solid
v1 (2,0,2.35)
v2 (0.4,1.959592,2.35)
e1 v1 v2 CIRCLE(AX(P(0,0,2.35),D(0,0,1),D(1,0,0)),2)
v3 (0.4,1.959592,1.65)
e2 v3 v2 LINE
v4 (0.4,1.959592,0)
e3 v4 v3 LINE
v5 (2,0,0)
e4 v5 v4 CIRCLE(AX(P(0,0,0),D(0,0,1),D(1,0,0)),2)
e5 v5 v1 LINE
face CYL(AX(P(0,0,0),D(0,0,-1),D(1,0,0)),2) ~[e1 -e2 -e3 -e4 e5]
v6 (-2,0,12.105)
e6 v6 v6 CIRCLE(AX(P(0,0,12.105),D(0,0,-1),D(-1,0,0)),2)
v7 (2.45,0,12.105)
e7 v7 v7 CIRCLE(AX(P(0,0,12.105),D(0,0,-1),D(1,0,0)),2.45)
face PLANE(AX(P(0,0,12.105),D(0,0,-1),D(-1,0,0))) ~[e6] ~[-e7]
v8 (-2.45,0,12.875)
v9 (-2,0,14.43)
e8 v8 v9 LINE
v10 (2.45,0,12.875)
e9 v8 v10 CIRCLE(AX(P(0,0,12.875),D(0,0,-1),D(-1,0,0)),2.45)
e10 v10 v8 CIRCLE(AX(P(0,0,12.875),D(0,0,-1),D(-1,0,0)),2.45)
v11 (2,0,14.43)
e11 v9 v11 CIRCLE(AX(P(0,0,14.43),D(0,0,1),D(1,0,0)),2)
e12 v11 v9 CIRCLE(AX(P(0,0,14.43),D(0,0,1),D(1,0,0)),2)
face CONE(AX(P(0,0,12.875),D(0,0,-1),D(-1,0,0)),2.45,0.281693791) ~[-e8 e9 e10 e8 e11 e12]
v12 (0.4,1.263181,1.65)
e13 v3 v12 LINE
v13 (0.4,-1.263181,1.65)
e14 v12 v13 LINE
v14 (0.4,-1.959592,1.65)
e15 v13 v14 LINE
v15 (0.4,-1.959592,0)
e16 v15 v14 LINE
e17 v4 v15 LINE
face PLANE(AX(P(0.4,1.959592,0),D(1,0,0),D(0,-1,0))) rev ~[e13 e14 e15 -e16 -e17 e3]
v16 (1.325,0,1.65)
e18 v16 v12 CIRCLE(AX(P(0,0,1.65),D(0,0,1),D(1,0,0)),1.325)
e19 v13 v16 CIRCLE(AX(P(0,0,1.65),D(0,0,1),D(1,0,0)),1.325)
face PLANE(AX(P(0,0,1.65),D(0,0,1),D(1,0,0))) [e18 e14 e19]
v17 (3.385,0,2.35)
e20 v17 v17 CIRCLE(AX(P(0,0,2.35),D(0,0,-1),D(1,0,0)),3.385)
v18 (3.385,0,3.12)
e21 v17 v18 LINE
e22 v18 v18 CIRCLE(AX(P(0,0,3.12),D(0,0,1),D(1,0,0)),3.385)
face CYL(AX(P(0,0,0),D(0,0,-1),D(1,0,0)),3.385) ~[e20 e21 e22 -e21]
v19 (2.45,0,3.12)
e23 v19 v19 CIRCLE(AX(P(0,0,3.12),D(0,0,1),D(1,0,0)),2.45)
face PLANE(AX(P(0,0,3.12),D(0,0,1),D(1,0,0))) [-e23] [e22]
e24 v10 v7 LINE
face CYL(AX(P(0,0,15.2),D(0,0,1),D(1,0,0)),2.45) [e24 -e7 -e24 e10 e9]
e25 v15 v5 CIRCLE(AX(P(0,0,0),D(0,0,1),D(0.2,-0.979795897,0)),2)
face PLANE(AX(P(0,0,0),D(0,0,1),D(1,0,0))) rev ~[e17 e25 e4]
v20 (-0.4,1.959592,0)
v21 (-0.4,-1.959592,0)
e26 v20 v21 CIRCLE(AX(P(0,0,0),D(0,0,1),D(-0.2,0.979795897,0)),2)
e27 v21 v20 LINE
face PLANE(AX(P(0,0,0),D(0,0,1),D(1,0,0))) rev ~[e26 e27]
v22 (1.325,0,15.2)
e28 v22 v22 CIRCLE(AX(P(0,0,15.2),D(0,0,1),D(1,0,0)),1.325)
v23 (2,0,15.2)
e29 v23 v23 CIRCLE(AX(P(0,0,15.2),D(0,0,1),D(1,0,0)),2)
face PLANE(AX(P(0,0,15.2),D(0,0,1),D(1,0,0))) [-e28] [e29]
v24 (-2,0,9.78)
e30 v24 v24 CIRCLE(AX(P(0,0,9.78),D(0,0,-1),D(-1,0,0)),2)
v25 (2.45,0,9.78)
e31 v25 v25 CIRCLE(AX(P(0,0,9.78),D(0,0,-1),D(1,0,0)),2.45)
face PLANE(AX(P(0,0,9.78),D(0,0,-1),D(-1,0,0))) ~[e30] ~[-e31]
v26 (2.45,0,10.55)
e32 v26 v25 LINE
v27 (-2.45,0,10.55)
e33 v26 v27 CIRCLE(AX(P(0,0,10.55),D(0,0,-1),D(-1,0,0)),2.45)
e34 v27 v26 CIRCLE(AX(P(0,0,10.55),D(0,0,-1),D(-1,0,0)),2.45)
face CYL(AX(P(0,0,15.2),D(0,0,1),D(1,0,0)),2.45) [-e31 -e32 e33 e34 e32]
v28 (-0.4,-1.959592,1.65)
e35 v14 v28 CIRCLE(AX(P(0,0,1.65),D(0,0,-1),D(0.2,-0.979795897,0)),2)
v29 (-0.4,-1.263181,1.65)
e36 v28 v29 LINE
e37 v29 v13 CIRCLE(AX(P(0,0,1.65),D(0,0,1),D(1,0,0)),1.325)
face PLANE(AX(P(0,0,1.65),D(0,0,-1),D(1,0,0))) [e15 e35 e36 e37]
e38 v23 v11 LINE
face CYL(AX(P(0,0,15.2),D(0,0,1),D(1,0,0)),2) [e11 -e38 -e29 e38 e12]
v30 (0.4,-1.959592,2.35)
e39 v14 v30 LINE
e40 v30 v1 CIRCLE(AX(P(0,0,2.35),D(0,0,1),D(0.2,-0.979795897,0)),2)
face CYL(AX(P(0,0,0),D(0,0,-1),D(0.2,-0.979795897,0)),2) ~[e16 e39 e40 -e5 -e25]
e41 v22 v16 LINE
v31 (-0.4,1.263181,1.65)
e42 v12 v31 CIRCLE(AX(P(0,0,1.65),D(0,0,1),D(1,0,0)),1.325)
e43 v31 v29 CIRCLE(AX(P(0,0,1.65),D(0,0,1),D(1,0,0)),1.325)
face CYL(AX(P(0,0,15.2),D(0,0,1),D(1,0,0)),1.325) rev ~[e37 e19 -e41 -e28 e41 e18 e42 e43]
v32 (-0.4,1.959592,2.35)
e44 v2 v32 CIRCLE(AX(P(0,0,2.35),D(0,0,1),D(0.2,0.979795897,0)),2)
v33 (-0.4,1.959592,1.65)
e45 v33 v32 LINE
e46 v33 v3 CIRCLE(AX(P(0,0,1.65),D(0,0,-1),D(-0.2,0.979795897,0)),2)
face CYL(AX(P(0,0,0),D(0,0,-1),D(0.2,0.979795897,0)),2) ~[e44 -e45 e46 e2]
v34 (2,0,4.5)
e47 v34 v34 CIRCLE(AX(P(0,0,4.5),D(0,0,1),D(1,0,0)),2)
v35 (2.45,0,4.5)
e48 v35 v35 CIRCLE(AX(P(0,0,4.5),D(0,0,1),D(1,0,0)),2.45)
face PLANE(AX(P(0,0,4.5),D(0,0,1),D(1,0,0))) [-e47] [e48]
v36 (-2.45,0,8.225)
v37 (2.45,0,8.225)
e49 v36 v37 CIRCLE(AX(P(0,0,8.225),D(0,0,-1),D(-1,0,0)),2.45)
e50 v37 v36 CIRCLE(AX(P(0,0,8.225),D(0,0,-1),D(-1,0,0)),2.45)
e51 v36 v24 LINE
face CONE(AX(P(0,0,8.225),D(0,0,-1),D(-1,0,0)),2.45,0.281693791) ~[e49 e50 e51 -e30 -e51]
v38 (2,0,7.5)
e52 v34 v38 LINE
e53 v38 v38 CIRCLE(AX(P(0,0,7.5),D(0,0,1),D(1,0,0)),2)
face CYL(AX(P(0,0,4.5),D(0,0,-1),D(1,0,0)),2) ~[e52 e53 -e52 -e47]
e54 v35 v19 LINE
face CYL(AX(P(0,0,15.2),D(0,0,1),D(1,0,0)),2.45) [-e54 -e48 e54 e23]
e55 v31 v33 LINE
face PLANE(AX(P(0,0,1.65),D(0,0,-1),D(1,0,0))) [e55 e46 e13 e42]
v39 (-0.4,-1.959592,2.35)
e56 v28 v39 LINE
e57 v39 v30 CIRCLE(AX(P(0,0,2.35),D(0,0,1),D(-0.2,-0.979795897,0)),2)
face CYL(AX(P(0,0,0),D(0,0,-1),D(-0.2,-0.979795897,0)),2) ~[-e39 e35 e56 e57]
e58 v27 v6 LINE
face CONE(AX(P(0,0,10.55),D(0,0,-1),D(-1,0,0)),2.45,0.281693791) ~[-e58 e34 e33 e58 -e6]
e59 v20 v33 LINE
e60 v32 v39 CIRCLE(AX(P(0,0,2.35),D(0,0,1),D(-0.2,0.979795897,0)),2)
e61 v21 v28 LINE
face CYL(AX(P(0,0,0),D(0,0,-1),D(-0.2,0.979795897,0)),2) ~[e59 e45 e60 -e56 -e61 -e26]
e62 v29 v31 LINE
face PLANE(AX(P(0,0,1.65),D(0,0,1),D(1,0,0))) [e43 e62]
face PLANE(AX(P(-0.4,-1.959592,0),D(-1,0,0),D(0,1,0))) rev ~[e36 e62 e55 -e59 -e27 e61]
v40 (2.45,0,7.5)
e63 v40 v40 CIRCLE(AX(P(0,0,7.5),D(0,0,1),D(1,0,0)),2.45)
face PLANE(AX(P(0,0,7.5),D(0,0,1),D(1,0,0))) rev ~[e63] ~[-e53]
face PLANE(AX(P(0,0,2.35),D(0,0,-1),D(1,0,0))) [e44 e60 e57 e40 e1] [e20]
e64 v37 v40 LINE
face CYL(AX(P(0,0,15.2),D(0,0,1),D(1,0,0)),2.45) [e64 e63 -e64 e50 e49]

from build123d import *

# Parameters (mm, degrees)
F0_R      = 3.385
F1_DEPTH  = 15.2
F2_R      = 3.385
F3_DEPTH  = 2.35
F4_DEPTH  = 1.65
F6_R      = 3.385
F6_R_2    = 2.45
F7_DEPTH  = 12.08
F9_R      = 3.385
F9_R_2    = 2
F10_DEPTH = 3
F11_R     = 2.45
F11_R_2   = 2
F12_DEPTH = 0.77
F31_R     = 1.325
F32_DEPTH = 13.55


with BuildPart() as f1:
    # F0 (on Top) → F1 (new body)
    with BuildSketch(Plane.XY):
        Circle(F0_R)
    extrude(amount=F1_DEPTH)

    # F2 (on face) → F3 (cut)
    with BuildSketch(Plane(origin=(0, 0, 0), x_dir=(1, 0, 0), z_dir=(0, 0, -1))):
        Circle(F2_R)
        with BuildLine():
            ThreePointArc((0.4, 1.9595917942), (1.5491933385, 1.2649110641), (2, 0))
            ThreePointArc((2, 0), (1.5491933385, -1.2649110641), (0.4, -1.9595917942))
            ThreePointArc((0.4, -1.9595917942), (0, -2), (-0.4, -1.9595917942))
            ThreePointArc((-0.4, -1.9595917942), (-2, 0), (-0.4, 1.9595917942))
            ThreePointArc((-0.4, 1.9595917942), (0, 2), (0.4, 1.9595917942))
        make_face(mode=Mode.SUBTRACT)
    extrude(amount=-F3_DEPTH, mode=Mode.SUBTRACT)

    # F2 (on face) → F4 (cut)
    with BuildSketch(Plane(origin=(0, 0, 0), x_dir=(1, 0, 0), z_dir=(0, 0, -1))):
        with BuildLine():
            Line((0.4, -1.9595917942), (0.4, 1.9595917942))
            ThreePointArc((0.4, 1.9595917942), (0, 2), (-0.4, 1.9595917942))
            Line((-0.4, 1.9595917942), (-0.4, -1.9595917942))
            ThreePointArc((-0.4, -1.9595917942), (0, -2), (0.4, -1.9595917942))
        make_face()
    extrude(amount=-F4_DEPTH, mode=Mode.SUBTRACT)

    # F6 (on face) → F7 (cut, through all)
    with BuildSketch(Plane.XY.offset(15.2)):
        Circle(F6_R)
        Circle(F6_R_2, mode=Mode.SUBTRACT)
    extrude(amount=-F7_DEPTH, mode=Mode.SUBTRACT)

    # F9 (on offset) → F10 (cut)
    with BuildSketch(Plane.XY.offset(4.5)):
        Circle(F9_R)
        Circle(F9_R_2, mode=Mode.SUBTRACT)
    extrude(amount=F10_DEPTH, mode=Mode.SUBTRACT)

    # F11 (on face) → F12 (cut)
    with BuildSketch(Plane.XY.offset(15.2)):
        Circle(F11_R)
        Circle(F11_R_2, mode=Mode.SUBTRACT)
    extrude(amount=-F12_DEPTH, mode=Mode.SUBTRACT)

    # F20 (on Front) → F28 (revolve, cut)
    with BuildSketch(Plane.XZ):
        Polygon((-2.45, 14.43), (-2.45, 12.875), (-2, 14.43), align=None)
    revolve(axis=Axis((0, 0, 10.2299177088), (0, 0, -1)), mode=Mode.SUBTRACT)

    # F23 (on Front) → F29 (revolve, cut)
    with BuildSketch(Plane.XZ):
        Polygon((-2.45, 12.105), (-2.45, 10.55), (-2, 12.105), align=None)
    revolve(axis=Axis((0, 0, 10.2299177088), (0, 0, -1)), mode=Mode.SUBTRACT)

    # F26 (on Front) → F30 (revolve, cut)
    with BuildSketch(Plane.XZ):
        Polygon((-2.45, 9.78), (-2.45, 8.225), (-2, 9.78), align=None)
    revolve(axis=Axis((0, 0, 10.2299177088), (0, 0, -1)), mode=Mode.SUBTRACT)

    # F31 (on face) → F32 (cut, through all)
    with BuildSketch(Plane.XY.offset(15.2)):
        Circle(F31_R)
    extrude(amount=-F32_DEPTH, mode=Mode.SUBTRACT)


solid = f1.part
